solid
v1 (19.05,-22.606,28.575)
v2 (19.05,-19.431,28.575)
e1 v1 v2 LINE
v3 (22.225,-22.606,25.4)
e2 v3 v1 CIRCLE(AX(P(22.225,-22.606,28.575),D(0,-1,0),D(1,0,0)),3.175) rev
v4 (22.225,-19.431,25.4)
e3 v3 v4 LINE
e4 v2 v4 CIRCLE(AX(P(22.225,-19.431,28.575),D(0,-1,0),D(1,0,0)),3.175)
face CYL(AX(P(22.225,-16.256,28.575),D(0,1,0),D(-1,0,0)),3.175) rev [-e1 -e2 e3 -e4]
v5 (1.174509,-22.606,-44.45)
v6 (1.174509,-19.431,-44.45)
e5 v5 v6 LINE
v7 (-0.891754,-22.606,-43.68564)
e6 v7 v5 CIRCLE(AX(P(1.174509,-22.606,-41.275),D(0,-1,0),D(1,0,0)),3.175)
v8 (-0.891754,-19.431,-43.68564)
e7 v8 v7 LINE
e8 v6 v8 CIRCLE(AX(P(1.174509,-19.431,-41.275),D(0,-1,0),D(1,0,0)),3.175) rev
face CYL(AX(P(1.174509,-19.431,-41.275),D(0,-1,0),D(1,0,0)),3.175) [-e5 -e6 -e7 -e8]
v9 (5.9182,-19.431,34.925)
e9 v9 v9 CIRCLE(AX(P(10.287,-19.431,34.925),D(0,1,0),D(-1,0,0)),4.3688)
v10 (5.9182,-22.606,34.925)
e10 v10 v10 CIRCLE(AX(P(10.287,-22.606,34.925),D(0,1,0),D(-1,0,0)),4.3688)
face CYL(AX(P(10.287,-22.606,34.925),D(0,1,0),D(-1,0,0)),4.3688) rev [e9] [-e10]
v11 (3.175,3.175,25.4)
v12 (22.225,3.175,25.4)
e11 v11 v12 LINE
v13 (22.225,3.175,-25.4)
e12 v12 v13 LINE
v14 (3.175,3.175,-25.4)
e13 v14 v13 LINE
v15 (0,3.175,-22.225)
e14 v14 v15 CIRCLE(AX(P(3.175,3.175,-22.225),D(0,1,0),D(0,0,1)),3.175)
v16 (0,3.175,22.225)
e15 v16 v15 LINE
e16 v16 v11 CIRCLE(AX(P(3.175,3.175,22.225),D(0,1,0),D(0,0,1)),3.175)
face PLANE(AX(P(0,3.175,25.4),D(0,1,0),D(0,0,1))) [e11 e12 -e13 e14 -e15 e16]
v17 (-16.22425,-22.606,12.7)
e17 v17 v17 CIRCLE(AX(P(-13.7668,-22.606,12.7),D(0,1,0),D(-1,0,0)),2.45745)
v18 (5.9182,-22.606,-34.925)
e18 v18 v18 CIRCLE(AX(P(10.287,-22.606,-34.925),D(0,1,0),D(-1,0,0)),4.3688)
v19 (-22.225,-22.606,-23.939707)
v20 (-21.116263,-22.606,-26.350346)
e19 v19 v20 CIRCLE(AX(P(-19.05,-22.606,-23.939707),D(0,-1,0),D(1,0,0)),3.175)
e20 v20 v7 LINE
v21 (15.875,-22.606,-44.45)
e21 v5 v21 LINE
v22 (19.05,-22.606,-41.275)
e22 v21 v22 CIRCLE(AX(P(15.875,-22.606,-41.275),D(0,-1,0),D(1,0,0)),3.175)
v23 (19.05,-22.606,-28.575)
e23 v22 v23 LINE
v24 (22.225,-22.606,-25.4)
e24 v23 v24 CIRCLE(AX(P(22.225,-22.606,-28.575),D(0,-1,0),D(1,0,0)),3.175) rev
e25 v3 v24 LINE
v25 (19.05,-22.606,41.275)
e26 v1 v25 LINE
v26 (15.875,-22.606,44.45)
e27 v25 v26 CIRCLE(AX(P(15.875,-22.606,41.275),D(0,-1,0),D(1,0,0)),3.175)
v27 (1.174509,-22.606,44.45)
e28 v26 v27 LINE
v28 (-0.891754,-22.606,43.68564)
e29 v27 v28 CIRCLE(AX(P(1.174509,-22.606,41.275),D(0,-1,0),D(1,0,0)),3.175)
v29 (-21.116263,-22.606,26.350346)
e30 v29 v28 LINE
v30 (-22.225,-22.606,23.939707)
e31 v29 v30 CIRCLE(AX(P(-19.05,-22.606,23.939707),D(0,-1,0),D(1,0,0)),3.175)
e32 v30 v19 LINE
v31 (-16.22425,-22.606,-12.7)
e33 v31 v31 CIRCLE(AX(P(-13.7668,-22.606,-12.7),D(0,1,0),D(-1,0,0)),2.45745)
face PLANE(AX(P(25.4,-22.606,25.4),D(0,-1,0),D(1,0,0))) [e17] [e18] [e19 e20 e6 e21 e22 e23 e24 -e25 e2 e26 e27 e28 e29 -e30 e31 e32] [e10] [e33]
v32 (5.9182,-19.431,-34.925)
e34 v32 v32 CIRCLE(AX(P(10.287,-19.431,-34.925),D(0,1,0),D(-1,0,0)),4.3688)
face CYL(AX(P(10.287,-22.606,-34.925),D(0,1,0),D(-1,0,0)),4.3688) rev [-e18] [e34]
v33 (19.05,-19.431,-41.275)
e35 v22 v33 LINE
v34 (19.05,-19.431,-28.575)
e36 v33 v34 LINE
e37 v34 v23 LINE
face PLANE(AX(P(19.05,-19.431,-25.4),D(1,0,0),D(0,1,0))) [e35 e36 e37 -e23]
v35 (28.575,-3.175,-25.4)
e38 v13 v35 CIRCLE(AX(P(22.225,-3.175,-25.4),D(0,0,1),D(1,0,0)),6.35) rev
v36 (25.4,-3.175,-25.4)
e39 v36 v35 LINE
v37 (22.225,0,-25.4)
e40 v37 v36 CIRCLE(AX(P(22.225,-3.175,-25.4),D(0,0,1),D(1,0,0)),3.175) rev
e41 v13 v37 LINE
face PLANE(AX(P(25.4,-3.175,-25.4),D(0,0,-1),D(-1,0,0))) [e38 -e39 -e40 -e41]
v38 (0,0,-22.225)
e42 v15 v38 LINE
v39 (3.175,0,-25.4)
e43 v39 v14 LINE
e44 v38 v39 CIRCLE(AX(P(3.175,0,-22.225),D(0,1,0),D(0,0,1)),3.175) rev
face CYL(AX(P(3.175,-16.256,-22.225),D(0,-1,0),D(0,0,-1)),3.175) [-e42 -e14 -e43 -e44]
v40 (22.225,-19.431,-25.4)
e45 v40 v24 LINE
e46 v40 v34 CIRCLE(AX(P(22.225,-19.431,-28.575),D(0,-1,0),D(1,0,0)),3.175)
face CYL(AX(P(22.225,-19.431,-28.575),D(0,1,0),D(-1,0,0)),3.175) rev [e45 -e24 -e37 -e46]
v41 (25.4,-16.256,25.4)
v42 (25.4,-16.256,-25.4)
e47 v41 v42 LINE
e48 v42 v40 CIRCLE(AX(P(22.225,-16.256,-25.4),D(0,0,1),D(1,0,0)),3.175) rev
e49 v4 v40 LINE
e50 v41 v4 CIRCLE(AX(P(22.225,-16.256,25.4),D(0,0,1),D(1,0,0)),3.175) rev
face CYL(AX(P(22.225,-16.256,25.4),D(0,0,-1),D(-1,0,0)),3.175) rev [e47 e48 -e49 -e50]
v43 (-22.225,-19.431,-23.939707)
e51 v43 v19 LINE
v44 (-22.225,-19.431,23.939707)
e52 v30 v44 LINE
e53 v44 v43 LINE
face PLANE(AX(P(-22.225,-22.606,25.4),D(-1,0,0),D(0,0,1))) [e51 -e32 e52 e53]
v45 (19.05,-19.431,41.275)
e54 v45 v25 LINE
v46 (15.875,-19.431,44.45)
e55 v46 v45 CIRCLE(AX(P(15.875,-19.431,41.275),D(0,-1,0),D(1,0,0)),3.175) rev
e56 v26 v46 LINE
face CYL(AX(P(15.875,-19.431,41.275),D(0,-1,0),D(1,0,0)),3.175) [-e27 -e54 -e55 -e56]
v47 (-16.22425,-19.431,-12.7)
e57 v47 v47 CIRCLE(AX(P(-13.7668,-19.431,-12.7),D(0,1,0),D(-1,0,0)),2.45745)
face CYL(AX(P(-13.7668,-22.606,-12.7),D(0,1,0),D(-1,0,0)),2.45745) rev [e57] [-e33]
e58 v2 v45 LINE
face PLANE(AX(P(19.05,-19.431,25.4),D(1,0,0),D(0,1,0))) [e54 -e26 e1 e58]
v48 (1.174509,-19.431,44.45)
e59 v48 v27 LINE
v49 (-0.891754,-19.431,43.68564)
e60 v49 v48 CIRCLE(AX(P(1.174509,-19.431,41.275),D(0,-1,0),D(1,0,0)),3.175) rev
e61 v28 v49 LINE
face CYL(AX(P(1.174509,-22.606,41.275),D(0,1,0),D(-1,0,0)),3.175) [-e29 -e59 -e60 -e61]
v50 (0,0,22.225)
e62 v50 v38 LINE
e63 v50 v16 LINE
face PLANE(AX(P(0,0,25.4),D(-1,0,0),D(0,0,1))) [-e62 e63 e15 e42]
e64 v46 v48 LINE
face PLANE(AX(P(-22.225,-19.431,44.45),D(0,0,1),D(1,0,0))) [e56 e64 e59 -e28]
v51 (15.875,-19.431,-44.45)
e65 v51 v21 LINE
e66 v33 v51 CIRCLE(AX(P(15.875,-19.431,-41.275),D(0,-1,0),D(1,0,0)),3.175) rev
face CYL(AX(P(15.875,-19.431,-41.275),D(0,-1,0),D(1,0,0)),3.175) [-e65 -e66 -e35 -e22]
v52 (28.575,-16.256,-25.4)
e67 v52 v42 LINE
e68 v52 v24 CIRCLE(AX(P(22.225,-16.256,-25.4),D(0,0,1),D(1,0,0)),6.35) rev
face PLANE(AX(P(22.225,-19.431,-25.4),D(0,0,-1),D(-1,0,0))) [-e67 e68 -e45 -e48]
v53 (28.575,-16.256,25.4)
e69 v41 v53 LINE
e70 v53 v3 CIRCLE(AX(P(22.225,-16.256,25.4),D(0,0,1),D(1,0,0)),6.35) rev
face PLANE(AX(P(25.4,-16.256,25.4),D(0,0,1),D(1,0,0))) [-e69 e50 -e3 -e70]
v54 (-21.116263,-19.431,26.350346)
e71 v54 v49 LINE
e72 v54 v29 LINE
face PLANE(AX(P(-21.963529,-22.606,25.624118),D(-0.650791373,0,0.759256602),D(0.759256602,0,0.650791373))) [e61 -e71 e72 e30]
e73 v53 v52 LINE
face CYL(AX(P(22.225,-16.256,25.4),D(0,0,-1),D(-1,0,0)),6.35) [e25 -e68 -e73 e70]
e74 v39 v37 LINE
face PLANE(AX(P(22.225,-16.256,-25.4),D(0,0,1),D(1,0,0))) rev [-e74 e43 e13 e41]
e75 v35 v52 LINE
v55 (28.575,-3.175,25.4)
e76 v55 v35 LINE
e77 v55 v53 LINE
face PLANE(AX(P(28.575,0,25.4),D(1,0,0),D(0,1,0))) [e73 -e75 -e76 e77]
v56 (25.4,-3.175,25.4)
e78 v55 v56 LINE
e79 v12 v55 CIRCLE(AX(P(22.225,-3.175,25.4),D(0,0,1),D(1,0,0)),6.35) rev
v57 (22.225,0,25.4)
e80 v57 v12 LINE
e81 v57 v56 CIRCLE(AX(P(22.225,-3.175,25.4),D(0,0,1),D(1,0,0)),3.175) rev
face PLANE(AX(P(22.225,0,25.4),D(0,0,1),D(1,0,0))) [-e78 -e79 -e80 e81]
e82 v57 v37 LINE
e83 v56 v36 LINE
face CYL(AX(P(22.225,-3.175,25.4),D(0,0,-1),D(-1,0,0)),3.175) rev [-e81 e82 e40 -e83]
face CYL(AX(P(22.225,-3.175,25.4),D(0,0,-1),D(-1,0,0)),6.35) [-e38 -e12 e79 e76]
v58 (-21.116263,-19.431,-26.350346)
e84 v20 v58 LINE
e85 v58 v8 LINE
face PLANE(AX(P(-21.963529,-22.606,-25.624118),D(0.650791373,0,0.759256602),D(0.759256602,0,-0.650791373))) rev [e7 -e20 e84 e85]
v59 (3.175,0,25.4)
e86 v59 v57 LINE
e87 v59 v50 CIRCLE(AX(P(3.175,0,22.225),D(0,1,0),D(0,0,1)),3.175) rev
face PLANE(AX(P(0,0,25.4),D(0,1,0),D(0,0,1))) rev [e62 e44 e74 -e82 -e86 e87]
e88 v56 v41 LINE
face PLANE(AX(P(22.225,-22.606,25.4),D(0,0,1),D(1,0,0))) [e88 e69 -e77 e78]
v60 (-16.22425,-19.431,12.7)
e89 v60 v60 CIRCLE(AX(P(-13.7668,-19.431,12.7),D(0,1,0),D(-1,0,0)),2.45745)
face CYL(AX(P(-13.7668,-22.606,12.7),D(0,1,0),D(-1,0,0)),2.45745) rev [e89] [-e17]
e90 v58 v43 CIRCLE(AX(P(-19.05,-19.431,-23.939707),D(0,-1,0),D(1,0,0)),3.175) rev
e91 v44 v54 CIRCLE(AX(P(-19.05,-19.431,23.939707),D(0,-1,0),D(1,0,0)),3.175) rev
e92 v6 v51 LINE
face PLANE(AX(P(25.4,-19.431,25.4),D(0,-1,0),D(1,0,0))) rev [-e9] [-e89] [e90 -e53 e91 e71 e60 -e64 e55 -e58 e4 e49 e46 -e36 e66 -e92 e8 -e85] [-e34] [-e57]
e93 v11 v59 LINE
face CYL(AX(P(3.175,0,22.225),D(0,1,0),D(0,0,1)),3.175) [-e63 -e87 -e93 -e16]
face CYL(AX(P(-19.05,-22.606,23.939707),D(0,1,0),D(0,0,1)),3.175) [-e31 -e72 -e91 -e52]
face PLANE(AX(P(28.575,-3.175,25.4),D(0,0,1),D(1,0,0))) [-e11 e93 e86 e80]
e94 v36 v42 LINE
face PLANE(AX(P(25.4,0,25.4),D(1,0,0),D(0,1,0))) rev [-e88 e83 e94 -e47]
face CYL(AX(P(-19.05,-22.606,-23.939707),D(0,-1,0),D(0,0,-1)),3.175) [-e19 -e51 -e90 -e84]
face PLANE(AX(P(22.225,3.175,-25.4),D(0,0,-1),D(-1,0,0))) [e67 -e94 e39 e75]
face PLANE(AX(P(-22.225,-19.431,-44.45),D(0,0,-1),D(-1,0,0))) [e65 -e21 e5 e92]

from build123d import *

# Parameters (mm, degrees)
BASE_FLANGE1_DEPTH  = 25.4
SKETCH7_W           = 41.275
SKETCH7_H           = 19.05
BOSS_EXTRUDE1_DEPTH = 3.175
SKETCH6_R           = 2.45745
SKETCH6_R_2         = 4.3688
CUT_EXTRUDE1_DEPTH  = 58.474902009
CUT_EXTRUDE2_DEPTH  = 58.474902009
FILLET1_R           = 3.175


# Sheet-metal steps are written as plain solids
with BuildPart() as part:
    # Sketch1 → Base-Flange1 (new, symmetric)
    with BuildSketch(Plane.XY):
        with BuildLine():
            Line((0, 0), (22.225, 0))
            ThreePointArc((22.225, 0), (24.47006403, -0.92993597), (25.4, -3.175))
            Line((25.4, -3.175), (25.4, -16.256))
            ThreePointArc((25.4, -16.256), (24.47006403, -18.50106403), (22.225, -19.431))
            Line((22.225, -19.431), (-22.225, -19.431))
            Line((-22.225, -19.431), (-22.225, -22.606))
            Line((-22.225, -22.606), (22.225, -22.606))
            ThreePointArc((22.225, -22.606), (26.715128061, -20.746128061), (28.575, -16.256))
            Line((28.575, -16.256), (28.575, -3.175))
            ThreePointArc((28.575, -3.175), (26.715128061, 1.315128061), (22.225, 3.175))
            Line((22.225, 3.175), (0, 3.175))
            Line((0, 3.175), (0, 0))
        make_face()
    extrude(amount=BASE_FLANGE1_DEPTH, both=True)

    # Sketch7 → Boss-Extrude1 (add)
    with BuildSketch(Plane.XZ.offset(22.606)):
        with Locations((-1.5875, 34.925)):
            Rectangle(SKETCH7_W, SKETCH7_H)
        with Locations((-1.5875, -34.925)):
            Rectangle(SKETCH7_W, SKETCH7_H)
    extrude(amount=-BOSS_EXTRUDE1_DEPTH)

    # Sketch6 → Cut-Extrude1 (cut, through all)
    with BuildSketch(Plane(origin=(0, -19.431, 0), x_dir=(1, 0, 0), z_dir=(0, 1, 0))):
        with Locations(Location((-13.7668, 12.7, 0), (0, 0, 180))):
            Circle(SKETCH6_R)
        with Locations(Location((-13.7668, -12.7, 0), (0, 0, 180))):
            Circle(SKETCH6_R)
        with Locations(Location((10.287, -34.925, 0), (0, 0, 180))):
            Circle(SKETCH6_R_2)
        with Locations(Location((10.287, 34.925, 0), (0, 0, 180))):
            Circle(SKETCH6_R_2)
    extrude(amount=-CUT_EXTRUDE1_DEPTH, mode=Mode.SUBTRACT)

    # Sketch8 → Cut-Extrude2 (cut, through all)
    with BuildSketch(Plane(origin=(0, -19.431, 0), x_dir=(1, 0, 0), z_dir=(0, 1, 0))):
        Polygon((0, -44.45), (-22.225, -25.4), (-22.225, -44.45), align=None)
        Polygon((-22.225, 44.45), (-22.225, 25.4), (0, 44.45), align=None)
    extrude(amount=-CUT_EXTRUDE2_DEPTH, mode=Mode.SUBTRACT)

    # Fillet1
    fillet1_edges = [part.edges().sort_by_distance(p)[0] for p in [
        (0, 1.5875, -25.4),
        (0, 1.5875, 25.4),
        (19.05, -21.0185, -25.4),
        (19.05, -21.0185, -44.45),
        (19.05, -21.0185, 25.4),
        (19.05, -21.0185, 44.45),
        (0, -21.0185, 44.45),
        (-22.225, -21.0185, 25.4),
        (0, -21.0185, -44.45),
        (-22.225, -21.0185, -25.4),
    ]]
    fillet(fillet1_edges, radius=FILLET1_R)


solid = part.part
